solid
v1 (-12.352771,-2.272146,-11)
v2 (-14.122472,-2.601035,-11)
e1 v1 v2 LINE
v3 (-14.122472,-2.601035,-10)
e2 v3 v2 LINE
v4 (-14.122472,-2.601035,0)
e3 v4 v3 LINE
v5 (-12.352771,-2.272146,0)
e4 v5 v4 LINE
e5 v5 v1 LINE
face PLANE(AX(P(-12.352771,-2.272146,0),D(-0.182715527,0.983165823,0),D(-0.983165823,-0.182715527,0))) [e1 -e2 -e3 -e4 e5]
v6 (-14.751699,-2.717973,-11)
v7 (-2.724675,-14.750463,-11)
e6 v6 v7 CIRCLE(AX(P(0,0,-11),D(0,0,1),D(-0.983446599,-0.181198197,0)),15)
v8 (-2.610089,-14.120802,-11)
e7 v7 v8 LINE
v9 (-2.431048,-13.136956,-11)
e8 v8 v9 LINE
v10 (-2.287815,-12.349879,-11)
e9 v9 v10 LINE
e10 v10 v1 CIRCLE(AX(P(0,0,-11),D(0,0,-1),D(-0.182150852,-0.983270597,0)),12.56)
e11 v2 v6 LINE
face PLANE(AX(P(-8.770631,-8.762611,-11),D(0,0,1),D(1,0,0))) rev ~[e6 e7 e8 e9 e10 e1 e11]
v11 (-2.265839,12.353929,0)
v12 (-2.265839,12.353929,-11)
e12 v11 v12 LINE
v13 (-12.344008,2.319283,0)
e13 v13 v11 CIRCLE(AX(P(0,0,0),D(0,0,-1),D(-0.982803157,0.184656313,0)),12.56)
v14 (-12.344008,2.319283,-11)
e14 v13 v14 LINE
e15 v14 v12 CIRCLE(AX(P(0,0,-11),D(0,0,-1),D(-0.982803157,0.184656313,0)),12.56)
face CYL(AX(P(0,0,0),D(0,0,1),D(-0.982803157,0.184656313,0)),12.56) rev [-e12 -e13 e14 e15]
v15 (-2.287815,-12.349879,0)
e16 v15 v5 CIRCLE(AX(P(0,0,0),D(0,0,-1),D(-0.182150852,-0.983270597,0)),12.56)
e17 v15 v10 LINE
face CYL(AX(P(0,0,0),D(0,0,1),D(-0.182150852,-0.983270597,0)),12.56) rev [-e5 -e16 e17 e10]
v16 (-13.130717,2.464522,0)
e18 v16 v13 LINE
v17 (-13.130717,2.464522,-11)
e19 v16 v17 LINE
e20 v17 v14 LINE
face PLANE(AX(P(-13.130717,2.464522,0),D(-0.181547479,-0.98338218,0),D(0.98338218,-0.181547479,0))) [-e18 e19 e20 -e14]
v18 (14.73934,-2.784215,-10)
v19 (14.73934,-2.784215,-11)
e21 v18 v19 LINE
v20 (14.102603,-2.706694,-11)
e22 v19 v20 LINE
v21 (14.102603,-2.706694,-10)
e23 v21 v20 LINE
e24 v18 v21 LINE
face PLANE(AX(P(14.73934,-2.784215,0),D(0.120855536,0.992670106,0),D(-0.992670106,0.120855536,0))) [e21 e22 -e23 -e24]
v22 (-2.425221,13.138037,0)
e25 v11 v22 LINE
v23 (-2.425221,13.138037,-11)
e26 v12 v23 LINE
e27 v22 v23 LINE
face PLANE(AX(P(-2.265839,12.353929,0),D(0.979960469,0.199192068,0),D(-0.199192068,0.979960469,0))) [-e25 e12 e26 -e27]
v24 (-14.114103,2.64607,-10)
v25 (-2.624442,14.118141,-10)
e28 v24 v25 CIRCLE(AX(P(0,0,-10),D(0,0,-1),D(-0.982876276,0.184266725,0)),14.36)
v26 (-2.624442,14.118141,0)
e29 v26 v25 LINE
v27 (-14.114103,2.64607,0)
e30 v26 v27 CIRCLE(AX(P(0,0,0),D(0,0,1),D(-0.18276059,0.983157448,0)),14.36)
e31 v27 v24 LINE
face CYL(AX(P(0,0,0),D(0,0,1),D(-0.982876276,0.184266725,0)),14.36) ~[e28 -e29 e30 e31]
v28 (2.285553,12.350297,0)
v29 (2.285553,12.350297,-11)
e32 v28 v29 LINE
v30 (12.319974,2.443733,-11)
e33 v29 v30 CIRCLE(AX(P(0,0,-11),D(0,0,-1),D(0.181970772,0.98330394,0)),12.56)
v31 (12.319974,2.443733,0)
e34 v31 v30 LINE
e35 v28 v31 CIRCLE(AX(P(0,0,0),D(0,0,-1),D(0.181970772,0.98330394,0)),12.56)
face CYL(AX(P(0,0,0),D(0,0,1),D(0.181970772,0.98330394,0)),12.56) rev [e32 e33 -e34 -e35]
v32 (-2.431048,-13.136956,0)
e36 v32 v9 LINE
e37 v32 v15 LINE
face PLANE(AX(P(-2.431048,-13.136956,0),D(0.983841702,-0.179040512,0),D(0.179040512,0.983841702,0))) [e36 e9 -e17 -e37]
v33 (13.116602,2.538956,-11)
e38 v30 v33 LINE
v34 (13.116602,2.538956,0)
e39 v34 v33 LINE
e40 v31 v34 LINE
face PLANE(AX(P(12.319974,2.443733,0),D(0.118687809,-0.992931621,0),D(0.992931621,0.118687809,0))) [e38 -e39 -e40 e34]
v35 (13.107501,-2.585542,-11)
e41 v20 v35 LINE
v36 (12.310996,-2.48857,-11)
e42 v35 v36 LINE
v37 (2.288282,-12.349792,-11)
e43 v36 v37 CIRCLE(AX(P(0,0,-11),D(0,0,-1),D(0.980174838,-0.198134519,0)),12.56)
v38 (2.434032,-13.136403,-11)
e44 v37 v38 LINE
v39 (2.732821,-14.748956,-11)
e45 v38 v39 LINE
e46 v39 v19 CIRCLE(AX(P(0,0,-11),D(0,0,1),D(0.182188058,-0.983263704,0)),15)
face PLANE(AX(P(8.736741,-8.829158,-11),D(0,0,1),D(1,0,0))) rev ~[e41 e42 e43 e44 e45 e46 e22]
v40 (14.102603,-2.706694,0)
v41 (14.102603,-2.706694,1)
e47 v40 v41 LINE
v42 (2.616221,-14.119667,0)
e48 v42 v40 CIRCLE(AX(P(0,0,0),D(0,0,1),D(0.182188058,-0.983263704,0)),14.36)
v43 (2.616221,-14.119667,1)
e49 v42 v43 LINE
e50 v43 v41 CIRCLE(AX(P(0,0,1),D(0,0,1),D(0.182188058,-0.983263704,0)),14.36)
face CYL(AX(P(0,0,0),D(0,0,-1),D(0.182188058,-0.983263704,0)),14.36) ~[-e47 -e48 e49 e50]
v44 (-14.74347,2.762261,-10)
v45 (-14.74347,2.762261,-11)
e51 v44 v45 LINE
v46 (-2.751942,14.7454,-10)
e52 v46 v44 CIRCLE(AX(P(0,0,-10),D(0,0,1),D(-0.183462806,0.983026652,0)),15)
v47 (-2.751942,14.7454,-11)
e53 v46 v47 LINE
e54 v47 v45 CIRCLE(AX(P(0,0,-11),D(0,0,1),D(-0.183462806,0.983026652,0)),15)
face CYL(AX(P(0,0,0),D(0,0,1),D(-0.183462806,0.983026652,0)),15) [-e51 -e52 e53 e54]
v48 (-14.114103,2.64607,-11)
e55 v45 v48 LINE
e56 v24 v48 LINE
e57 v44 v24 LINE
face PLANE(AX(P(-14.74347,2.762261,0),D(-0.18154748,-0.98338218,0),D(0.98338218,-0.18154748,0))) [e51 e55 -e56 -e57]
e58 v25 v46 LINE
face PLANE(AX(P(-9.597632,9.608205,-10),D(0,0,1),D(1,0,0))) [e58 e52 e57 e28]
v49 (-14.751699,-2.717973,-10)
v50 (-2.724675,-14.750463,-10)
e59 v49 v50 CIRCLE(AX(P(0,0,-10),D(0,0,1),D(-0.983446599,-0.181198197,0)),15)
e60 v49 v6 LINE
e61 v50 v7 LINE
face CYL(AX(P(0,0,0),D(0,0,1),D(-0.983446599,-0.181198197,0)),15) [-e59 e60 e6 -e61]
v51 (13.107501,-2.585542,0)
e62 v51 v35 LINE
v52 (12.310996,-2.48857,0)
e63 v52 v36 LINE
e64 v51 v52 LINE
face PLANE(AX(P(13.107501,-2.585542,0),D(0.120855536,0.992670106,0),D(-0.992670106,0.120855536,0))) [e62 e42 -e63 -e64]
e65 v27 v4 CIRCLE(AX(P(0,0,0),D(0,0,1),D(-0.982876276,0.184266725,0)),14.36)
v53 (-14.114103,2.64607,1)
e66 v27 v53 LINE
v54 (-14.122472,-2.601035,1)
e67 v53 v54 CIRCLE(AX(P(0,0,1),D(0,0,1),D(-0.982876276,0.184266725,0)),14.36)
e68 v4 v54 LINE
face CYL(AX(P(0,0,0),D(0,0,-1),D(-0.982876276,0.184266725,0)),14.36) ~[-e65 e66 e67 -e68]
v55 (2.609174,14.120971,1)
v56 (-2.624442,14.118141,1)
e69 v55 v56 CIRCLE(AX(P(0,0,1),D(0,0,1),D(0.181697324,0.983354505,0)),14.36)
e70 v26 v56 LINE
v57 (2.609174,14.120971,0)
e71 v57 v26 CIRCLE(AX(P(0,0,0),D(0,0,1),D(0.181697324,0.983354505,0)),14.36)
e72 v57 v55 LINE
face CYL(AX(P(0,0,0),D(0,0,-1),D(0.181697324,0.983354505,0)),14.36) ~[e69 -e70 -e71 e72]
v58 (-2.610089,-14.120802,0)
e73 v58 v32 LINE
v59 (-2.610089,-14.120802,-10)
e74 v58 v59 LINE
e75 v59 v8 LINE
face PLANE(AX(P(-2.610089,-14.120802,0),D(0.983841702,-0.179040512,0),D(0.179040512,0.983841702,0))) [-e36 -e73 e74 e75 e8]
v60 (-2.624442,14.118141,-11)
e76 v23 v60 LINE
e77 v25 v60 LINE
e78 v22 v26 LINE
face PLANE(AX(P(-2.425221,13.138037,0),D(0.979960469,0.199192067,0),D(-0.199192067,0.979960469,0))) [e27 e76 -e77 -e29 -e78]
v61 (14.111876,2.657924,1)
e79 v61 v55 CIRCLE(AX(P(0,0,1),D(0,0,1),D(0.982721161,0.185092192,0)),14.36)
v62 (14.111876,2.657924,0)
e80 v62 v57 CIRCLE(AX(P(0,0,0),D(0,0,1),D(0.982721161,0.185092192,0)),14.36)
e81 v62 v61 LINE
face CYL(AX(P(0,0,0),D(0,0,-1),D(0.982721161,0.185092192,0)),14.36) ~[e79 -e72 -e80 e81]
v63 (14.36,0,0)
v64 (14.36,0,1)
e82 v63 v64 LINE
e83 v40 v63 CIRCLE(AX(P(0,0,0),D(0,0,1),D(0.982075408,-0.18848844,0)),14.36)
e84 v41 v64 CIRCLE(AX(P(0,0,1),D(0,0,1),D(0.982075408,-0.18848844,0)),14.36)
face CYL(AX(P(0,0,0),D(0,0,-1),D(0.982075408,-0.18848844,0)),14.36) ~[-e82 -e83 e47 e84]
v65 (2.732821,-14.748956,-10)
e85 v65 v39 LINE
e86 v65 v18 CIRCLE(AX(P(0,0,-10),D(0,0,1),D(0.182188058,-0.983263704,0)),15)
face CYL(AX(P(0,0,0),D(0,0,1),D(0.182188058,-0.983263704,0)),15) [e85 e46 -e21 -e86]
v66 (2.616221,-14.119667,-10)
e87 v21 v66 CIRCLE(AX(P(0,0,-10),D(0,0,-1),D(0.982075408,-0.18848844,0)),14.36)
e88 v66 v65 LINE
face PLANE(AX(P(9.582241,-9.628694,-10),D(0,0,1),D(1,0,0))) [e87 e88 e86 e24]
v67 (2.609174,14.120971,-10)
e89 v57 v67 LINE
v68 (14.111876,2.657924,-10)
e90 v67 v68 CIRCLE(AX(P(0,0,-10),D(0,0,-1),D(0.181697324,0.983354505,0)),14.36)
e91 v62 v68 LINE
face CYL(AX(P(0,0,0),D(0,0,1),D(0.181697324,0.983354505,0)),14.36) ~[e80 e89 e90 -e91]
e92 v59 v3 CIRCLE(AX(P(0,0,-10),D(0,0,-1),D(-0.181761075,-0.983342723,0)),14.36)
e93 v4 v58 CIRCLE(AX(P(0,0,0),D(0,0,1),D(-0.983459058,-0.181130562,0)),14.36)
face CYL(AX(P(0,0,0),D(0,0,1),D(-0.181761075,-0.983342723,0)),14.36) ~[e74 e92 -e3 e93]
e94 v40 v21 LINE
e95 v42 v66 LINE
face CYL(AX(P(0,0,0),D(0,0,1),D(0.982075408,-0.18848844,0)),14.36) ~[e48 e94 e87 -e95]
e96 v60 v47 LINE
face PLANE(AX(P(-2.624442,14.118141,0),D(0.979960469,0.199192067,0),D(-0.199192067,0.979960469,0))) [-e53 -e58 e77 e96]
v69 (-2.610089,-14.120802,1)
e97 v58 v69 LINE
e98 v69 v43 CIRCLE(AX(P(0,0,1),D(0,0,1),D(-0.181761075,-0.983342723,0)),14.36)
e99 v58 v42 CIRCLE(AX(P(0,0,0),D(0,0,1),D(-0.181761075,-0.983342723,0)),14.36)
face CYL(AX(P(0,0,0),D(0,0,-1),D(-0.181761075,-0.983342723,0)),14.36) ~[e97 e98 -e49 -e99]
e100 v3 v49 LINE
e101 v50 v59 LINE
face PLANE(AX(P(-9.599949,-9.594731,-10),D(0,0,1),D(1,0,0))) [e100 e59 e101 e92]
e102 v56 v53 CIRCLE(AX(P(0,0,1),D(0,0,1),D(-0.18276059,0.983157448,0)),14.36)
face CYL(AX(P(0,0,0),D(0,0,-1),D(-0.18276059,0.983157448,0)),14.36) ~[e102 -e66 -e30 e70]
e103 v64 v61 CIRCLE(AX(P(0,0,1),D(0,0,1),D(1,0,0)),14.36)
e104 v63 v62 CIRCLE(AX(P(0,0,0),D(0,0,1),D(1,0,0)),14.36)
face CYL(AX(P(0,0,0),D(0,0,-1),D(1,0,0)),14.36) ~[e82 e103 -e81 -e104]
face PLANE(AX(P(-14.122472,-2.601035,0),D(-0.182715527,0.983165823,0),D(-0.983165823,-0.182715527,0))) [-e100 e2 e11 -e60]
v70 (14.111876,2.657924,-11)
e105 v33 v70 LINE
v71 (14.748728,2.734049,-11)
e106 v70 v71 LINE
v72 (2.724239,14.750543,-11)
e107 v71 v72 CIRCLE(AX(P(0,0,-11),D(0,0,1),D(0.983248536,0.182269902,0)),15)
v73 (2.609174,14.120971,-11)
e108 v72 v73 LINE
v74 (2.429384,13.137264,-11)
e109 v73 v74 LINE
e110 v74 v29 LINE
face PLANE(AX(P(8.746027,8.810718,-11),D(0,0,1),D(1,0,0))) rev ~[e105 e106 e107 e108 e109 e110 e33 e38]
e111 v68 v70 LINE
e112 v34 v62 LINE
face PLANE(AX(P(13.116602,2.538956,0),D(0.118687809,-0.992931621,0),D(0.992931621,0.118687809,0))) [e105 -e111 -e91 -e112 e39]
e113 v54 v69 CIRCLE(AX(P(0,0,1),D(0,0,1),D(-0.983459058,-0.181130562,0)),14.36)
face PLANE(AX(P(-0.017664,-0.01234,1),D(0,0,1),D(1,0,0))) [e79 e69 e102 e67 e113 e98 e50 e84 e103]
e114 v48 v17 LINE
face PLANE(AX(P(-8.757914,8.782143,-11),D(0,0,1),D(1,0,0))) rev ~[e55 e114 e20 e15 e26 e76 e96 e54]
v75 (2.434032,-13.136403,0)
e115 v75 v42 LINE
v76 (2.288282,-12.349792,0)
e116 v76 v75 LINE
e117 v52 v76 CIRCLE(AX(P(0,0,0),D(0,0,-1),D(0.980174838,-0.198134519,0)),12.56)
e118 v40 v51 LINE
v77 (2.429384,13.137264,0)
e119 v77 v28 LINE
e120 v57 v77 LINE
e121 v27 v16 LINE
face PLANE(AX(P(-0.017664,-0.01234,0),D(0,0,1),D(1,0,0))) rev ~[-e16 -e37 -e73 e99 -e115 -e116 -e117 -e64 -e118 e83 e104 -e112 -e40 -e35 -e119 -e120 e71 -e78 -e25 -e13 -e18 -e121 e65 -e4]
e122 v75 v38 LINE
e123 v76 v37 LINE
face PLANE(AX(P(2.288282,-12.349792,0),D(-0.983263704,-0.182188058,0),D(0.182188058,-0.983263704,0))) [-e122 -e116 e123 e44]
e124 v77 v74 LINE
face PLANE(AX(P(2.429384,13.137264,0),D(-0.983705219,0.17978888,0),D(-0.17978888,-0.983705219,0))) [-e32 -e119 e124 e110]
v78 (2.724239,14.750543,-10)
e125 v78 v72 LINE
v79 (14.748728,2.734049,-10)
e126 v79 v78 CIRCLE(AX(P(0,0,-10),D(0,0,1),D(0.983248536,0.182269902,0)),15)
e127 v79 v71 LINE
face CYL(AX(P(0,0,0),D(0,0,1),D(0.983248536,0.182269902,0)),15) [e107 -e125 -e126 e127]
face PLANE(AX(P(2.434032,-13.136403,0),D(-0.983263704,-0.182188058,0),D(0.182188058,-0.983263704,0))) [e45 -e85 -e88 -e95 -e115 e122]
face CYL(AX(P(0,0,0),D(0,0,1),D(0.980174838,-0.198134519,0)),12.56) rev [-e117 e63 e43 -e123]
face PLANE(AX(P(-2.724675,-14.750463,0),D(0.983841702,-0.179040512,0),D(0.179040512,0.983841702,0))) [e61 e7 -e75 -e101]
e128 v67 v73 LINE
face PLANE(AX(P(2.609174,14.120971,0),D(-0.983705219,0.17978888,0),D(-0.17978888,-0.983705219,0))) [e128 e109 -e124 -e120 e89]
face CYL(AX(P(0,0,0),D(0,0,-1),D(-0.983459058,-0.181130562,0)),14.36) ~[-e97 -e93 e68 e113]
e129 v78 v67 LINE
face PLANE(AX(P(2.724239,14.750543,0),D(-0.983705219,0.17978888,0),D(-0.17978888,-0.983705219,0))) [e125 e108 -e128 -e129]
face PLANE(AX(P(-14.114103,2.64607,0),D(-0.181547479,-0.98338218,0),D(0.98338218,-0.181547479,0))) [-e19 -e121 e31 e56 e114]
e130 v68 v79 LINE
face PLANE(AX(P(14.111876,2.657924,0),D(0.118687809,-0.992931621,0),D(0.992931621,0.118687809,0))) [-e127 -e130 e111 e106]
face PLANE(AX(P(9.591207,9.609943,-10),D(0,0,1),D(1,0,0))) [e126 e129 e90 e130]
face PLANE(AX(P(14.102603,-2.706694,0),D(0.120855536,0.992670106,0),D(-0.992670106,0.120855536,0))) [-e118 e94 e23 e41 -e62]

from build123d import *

# Parameters (mm, degrees)
F1_DEPTH = 1
F2_DEPTH = 11
F3_DEPTH = 10


with BuildPart() as f1:
    # F0 (on Top) → F1 (new body)
    with BuildSketch(Plane.XY):
        with BuildLine():
            ThreePointArc((12.3109959605, -2.4885695612), (12.4975939537, -1.250498048), (12.56, 0))
            ThreePointArc((12.56, 0), (12.499849565, 1.227746249), (12.3199743866, 2.4437330282))
            ThreePointArc((12.3199743866, 2.4437330282), (8.8241351782, 8.9380220607), (2.2855528975, 12.3502974844))
            ThreePointArc((2.2855528975, 12.3502974844), (0.0100228873, 12.5599960009), (-2.2658389037, 12.3539294988))
            ThreePointArc((-2.2658389037, 12.3539294988), (-8.8620220769, 8.9004586797), (-12.3440076572, 2.3192832854))
            ThreePointArc((-12.3440076572, 2.3192832854), (-12.559977123, 0.023972266), (-12.3527709674, -2.2721464362))
            ThreePointArc((-12.3527709674, -2.2721464362), (-8.8868925427, -8.8756262277), (-2.2878147001, -12.3498786997))
            ThreePointArc((-2.2878147001, -12.3498786997), (0.0002376292, -12.5599999978), (2.2882820061, -12.3497921222))
            ThreePointArc((2.2882820061, -12.3497921222), (8.8088397015, -8.9530968449), (12.3109959605, -2.4885695612))
        make_face()
        with BuildLine():
            ThreePointArc((12.3199743866, 2.4437330282), (12.499849565, 1.227746249), (12.56, 0))
            ThreePointArc((12.56, 0), (12.4975939537, -1.250498048), (12.3109959605, -2.4885695612))
            Line((12.3109959605, -2.4885695612), (13.1075011071, -2.5855424186))
            Line((13.1075011071, -2.5855424186), (14.1026028651, -2.7066940036))
            ThreePointArc((14.1026028651, -2.7066940036), (14.2955058872, -1.3594526209), (14.36, 0))
            ThreePointArc((14.36, 0), (14.2978344087, 1.334740133), (14.1118758743, 2.657923872))
            Line((14.1118758743, 2.657923872), (13.1166017889, 2.5389560617))
            Line((13.1166017889, 2.5389560617), (12.3199743866, 2.4437330282))
        make_face()
        with BuildLine():
            ThreePointArc((2.2855528975, 12.3502974844), (8.8241351782, 8.9380220607), (12.3199743866, 2.4437330282))
            Line((12.3199743866, 2.4437330282), (13.1166017889, 2.5389560617))
            Line((13.1166017889, 2.5389560617), (14.1118758743, 2.657923872))
            ThreePointArc((14.1118758743, 2.657923872), (10.136505033, 10.1715714477), (2.6091735777, 14.1209706905))
            Line((2.6091735777, 14.1209706905), (2.4293843449, 13.1372635399))
            Line((2.4293843449, 13.1372635399), (2.2855528975, 12.3502974844))
        make_face()
        with BuildLine():
            Line((13.1075011071, -2.5855424186), (12.3109959605, -2.4885695612))
            ThreePointArc((12.3109959605, -2.4885695612), (8.8088397015, -8.9530968449), (2.2882820061, -12.3497921222))
            Line((2.2882820061, -12.3497921222), (2.4340324524, -13.1364030853))
            Line((2.4340324524, -13.1364030853), (2.6162205102, -14.1196667893))
            ThreePointArc((2.6162205102, -14.1196667893), (10.1214500303, -10.1865523748), (14.1026028651, -2.7066940036))
            Line((14.1026028651, -2.7066940036), (13.1075011071, -2.5855424186))
        make_face()
        with BuildLine():
            ThreePointArc((-2.2658389037, 12.3539294988), (0.0100228873, 12.5599960009), (2.2855528975, 12.3502974844))
            Line((2.2855528975, 12.3502974844), (2.4293843449, 13.1372635399))
            Line((2.4293843449, 13.1372635399), (2.6091735777, 14.1209706905))
            ThreePointArc((2.6091735777, 14.1209706905), (-0.0077642493, 14.359997901), (-2.624442069, 14.118140948))
            Line((-2.624442069, 14.118140948), (-2.4252208949, 13.1380372835))
            Line((-2.4252208949, 13.1380372835), (-2.2658389037, 12.3539294988))
        make_face()
        with BuildLine():
            Line((2.4340324524, -13.1364030853), (2.2882820061, -12.3497921222))
            ThreePointArc((2.2882820061, -12.3497921222), (0.0002376292, -12.5599999978), (-2.2878147001, -12.3498786997))
            Line((-2.2878147001, -12.3498786997), (-2.431047805, -13.136955882))
            Line((-2.431047805, -13.136955882), (-2.6100890312, -14.1208015087))
            ThreePointArc((-2.6100890312, -14.1208015087), (0.0031177966, -14.3599996615), (2.6162205102, -14.1196667893))
            Line((2.6162205102, -14.1196667893), (2.4340324524, -13.1364030853))
        make_face()
        with BuildLine():
            ThreePointArc((-12.3440076572, 2.3192832854), (-8.8620220769, 8.9004586797), (-2.2658389037, 12.3539294988))
            Line((-2.2658389037, 12.3539294988), (-2.4252208949, 13.1380372835))
            Line((-2.4252208949, 13.1380372835), (-2.624442069, 14.118140948))
            ThreePointArc((-2.624442069, 14.118140948), (-10.146271601, 10.1618291955), (-14.1141033231, 2.6460701775))
            Line((-14.1141033231, 2.6460701775), (-13.1307172202, 2.4645219739))
            Line((-13.1307172202, 2.4645219739), (-12.3440076572, 2.3192832854))
        make_face()
        with BuildLine():
            Line((-2.431047805, -13.136955882), (-2.2878147001, -12.3498786997))
            ThreePointArc((-2.2878147001, -12.3498786997), (-8.8868925427, -8.8756262277), (-12.3527709674, -2.2721464362))
            Line((-12.3527709674, -2.2721464362), (-14.1224720777, -2.601034874))
            ThreePointArc((-14.1224720777, -2.601034874), (-10.1573080166, -10.1507976955), (-2.6100890312, -14.1208015087))
            Line((-2.6100890312, -14.1208015087), (-2.431047805, -13.136955882))
        make_face()
        with BuildLine():
            ThreePointArc((-12.3527709674, -2.2721464362), (-12.559977123, 0.023972266), (-12.3440076572, 2.3192832854))
            Line((-12.3440076572, 2.3192832854), (-13.1307172202, 2.4645219739))
            Line((-13.1307172202, 2.4645219739), (-14.1141033231, 2.6460701775))
            ThreePointArc((-14.1141033231, 2.6460701775), (-14.3599817356, 0.0229031363), (-14.1224720777, -2.601034874))
            Line((-14.1224720777, -2.601034874), (-12.3527709674, -2.2721464362))
        make_face()
    extrude(amount=F1_DEPTH)

    # F0 (on Top) → F2 (join)
    with BuildSketch(Plane.XY):
        with BuildLine():
            ThreePointArc((2.2855528975, 12.3502974844), (8.8241351782, 8.9380220607), (12.3199743866, 2.4437330282))
            Line((12.3199743866, 2.4437330282), (13.1166017889, 2.5389560617))
            Line((13.1166017889, 2.5389560617), (14.1118758743, 2.657923872))
            ThreePointArc((14.1118758743, 2.657923872), (10.136505033, 10.1715714477), (2.6091735777, 14.1209706905))
            Line((2.6091735777, 14.1209706905), (2.4293843449, 13.1372635399))
            Line((2.4293843449, 13.1372635399), (2.2855528975, 12.3502974844))
        make_face()
        with BuildLine():
            Line((13.1075011071, -2.5855424186), (12.3109959605, -2.4885695612))
            ThreePointArc((12.3109959605, -2.4885695612), (8.8088397015, -8.9530968449), (2.2882820061, -12.3497921222))
            Line((2.2882820061, -12.3497921222), (2.4340324524, -13.1364030853))
            Line((2.4340324524, -13.1364030853), (2.6162205102, -14.1196667893))
            ThreePointArc((2.6162205102, -14.1196667893), (10.1214500303, -10.1865523748), (14.1026028651, -2.7066940036))
            Line((14.1026028651, -2.7066940036), (13.1075011071, -2.5855424186))
        make_face()
        with BuildLine():
            ThreePointArc((-12.3440076572, 2.3192832854), (-8.8620220769, 8.9004586797), (-2.2658389037, 12.3539294988))
            Line((-2.2658389037, 12.3539294988), (-2.4252208949, 13.1380372835))
            Line((-2.4252208949, 13.1380372835), (-2.624442069, 14.118140948))
            ThreePointArc((-2.624442069, 14.118140948), (-10.146271601, 10.1618291955), (-14.1141033231, 2.6460701775))
            Line((-14.1141033231, 2.6460701775), (-13.1307172202, 2.4645219739))
            Line((-13.1307172202, 2.4645219739), (-12.3440076572, 2.3192832854))
        make_face()
        with BuildLine():
            ThreePointArc((2.6091735777, 14.1209706905), (10.136505033, 10.1715714477), (14.1118758743, 2.657923872))
            Line((14.1118758743, 2.657923872), (14.7487280331, 2.7340485374))
            ThreePointArc((14.7487280331, 2.7340485374), (10.6030739469, 10.6101283158), (2.7242386681, 14.7505431656))
            Line((2.7242386681, 14.7505431656), (2.6091735777, 14.1209706905))
        make_face()
        with BuildLine():
            Line((-2.431047805, -13.136955882), (-2.2878147001, -12.3498786997))
            ThreePointArc((-2.2878147001, -12.3498786997), (-8.8868925427, -8.8756262277), (-12.3527709674, -2.2721464362))
            Line((-12.3527709674, -2.2721464362), (-14.1224720777, -2.601034874))
            ThreePointArc((-14.1224720777, -2.601034874), (-10.1573080166, -10.1507976955), (-2.6100890312, -14.1208015087))
            Line((-2.6100890312, -14.1208015087), (-2.431047805, -13.136955882))
        make_face()
        with BuildLine():
            Line((14.7393400257, -2.7842154385), (14.1026028651, -2.7066940036))
            ThreePointArc((14.1026028651, -2.7066940036), (10.1214500303, -10.1865523748), (2.6162205102, -14.1196667893))
            Line((2.6162205102, -14.1196667893), (2.7328208672, -14.7489555599))
            ThreePointArc((2.7328208672, -14.7489555599), (10.5880995986, -10.6250716181), (14.7393400257, -2.7842154385))
        make_face()
        with BuildLine():
            ThreePointArc((-14.1141033231, 2.6460701775), (-10.146271601, 10.1618291955), (-2.624442069, 14.118140948))
            Line((-2.624442069, 14.118140948), (-2.7519420936, 14.7453997814))
            ThreePointArc((-2.7519420936, 14.7453997814), (-10.6028895523, 10.6103125845), (-14.7434702232, 2.7622609899))
            Line((-14.7434702232, 2.7622609899), (-14.1141033231, 2.6460701775))
        make_face()
        with BuildLine():
            ThreePointArc((-2.6100890312, -14.1208015087), (-10.1573080166, -10.1507976955), (-14.1224720777, -2.601034874))
            Line((-14.1224720777, -2.601034874), (-14.7516989871, -2.717972957))
            ThreePointArc((-14.7516989871, -2.717972957), (-10.6090110951, -10.6041917931), (-2.7246753784, -14.750462504))
            Line((-2.7246753784, -14.750462504), (-2.6100890312, -14.1208015087))
        make_face()
    extrude(amount=-F2_DEPTH)

    # F0 (on Top) → F3 (cut)
    with BuildSketch(Plane.XY):
        with BuildLine():
            ThreePointArc((-14.1141033231, 2.6460701775), (-10.146271601, 10.1618291955), (-2.624442069, 14.118140948))
            Line((-2.624442069, 14.118140948), (-2.7519420936, 14.7453997814))
            ThreePointArc((-2.7519420936, 14.7453997814), (-10.6028895523, 10.6103125845), (-14.7434702232, 2.7622609899))
            Line((-14.7434702232, 2.7622609899), (-14.1141033231, 2.6460701775))
        make_face()
        with BuildLine():
            ThreePointArc((2.6091735777, 14.1209706905), (10.136505033, 10.1715714477), (14.1118758743, 2.657923872))
            Line((14.1118758743, 2.657923872), (14.7487280331, 2.7340485374))
            ThreePointArc((14.7487280331, 2.7340485374), (10.6030739469, 10.6101283158), (2.7242386681, 14.7505431656))
            Line((2.7242386681, 14.7505431656), (2.6091735777, 14.1209706905))
        make_face()
        with BuildLine():
            Line((14.7393400257, -2.7842154385), (14.1026028651, -2.7066940036))
            ThreePointArc((14.1026028651, -2.7066940036), (10.1214500303, -10.1865523748), (2.6162205102, -14.1196667893))
            Line((2.6162205102, -14.1196667893), (2.7328208672, -14.7489555599))
            ThreePointArc((2.7328208672, -14.7489555599), (10.5880995986, -10.6250716181), (14.7393400257, -2.7842154385))
        make_face()
        with BuildLine():
            ThreePointArc((-2.6100890312, -14.1208015087), (-10.1573080166, -10.1507976955), (-14.1224720777, -2.601034874))
            Line((-14.1224720777, -2.601034874), (-14.7516989871, -2.717972957))
            ThreePointArc((-14.7516989871, -2.717972957), (-10.6090110951, -10.6041917931), (-2.7246753784, -14.750462504))
            Line((-2.7246753784, -14.750462504), (-2.6100890312, -14.1208015087))
        make_face()
    extrude(amount=-F3_DEPTH, mode=Mode.SUBTRACT)


solid = f1.part
